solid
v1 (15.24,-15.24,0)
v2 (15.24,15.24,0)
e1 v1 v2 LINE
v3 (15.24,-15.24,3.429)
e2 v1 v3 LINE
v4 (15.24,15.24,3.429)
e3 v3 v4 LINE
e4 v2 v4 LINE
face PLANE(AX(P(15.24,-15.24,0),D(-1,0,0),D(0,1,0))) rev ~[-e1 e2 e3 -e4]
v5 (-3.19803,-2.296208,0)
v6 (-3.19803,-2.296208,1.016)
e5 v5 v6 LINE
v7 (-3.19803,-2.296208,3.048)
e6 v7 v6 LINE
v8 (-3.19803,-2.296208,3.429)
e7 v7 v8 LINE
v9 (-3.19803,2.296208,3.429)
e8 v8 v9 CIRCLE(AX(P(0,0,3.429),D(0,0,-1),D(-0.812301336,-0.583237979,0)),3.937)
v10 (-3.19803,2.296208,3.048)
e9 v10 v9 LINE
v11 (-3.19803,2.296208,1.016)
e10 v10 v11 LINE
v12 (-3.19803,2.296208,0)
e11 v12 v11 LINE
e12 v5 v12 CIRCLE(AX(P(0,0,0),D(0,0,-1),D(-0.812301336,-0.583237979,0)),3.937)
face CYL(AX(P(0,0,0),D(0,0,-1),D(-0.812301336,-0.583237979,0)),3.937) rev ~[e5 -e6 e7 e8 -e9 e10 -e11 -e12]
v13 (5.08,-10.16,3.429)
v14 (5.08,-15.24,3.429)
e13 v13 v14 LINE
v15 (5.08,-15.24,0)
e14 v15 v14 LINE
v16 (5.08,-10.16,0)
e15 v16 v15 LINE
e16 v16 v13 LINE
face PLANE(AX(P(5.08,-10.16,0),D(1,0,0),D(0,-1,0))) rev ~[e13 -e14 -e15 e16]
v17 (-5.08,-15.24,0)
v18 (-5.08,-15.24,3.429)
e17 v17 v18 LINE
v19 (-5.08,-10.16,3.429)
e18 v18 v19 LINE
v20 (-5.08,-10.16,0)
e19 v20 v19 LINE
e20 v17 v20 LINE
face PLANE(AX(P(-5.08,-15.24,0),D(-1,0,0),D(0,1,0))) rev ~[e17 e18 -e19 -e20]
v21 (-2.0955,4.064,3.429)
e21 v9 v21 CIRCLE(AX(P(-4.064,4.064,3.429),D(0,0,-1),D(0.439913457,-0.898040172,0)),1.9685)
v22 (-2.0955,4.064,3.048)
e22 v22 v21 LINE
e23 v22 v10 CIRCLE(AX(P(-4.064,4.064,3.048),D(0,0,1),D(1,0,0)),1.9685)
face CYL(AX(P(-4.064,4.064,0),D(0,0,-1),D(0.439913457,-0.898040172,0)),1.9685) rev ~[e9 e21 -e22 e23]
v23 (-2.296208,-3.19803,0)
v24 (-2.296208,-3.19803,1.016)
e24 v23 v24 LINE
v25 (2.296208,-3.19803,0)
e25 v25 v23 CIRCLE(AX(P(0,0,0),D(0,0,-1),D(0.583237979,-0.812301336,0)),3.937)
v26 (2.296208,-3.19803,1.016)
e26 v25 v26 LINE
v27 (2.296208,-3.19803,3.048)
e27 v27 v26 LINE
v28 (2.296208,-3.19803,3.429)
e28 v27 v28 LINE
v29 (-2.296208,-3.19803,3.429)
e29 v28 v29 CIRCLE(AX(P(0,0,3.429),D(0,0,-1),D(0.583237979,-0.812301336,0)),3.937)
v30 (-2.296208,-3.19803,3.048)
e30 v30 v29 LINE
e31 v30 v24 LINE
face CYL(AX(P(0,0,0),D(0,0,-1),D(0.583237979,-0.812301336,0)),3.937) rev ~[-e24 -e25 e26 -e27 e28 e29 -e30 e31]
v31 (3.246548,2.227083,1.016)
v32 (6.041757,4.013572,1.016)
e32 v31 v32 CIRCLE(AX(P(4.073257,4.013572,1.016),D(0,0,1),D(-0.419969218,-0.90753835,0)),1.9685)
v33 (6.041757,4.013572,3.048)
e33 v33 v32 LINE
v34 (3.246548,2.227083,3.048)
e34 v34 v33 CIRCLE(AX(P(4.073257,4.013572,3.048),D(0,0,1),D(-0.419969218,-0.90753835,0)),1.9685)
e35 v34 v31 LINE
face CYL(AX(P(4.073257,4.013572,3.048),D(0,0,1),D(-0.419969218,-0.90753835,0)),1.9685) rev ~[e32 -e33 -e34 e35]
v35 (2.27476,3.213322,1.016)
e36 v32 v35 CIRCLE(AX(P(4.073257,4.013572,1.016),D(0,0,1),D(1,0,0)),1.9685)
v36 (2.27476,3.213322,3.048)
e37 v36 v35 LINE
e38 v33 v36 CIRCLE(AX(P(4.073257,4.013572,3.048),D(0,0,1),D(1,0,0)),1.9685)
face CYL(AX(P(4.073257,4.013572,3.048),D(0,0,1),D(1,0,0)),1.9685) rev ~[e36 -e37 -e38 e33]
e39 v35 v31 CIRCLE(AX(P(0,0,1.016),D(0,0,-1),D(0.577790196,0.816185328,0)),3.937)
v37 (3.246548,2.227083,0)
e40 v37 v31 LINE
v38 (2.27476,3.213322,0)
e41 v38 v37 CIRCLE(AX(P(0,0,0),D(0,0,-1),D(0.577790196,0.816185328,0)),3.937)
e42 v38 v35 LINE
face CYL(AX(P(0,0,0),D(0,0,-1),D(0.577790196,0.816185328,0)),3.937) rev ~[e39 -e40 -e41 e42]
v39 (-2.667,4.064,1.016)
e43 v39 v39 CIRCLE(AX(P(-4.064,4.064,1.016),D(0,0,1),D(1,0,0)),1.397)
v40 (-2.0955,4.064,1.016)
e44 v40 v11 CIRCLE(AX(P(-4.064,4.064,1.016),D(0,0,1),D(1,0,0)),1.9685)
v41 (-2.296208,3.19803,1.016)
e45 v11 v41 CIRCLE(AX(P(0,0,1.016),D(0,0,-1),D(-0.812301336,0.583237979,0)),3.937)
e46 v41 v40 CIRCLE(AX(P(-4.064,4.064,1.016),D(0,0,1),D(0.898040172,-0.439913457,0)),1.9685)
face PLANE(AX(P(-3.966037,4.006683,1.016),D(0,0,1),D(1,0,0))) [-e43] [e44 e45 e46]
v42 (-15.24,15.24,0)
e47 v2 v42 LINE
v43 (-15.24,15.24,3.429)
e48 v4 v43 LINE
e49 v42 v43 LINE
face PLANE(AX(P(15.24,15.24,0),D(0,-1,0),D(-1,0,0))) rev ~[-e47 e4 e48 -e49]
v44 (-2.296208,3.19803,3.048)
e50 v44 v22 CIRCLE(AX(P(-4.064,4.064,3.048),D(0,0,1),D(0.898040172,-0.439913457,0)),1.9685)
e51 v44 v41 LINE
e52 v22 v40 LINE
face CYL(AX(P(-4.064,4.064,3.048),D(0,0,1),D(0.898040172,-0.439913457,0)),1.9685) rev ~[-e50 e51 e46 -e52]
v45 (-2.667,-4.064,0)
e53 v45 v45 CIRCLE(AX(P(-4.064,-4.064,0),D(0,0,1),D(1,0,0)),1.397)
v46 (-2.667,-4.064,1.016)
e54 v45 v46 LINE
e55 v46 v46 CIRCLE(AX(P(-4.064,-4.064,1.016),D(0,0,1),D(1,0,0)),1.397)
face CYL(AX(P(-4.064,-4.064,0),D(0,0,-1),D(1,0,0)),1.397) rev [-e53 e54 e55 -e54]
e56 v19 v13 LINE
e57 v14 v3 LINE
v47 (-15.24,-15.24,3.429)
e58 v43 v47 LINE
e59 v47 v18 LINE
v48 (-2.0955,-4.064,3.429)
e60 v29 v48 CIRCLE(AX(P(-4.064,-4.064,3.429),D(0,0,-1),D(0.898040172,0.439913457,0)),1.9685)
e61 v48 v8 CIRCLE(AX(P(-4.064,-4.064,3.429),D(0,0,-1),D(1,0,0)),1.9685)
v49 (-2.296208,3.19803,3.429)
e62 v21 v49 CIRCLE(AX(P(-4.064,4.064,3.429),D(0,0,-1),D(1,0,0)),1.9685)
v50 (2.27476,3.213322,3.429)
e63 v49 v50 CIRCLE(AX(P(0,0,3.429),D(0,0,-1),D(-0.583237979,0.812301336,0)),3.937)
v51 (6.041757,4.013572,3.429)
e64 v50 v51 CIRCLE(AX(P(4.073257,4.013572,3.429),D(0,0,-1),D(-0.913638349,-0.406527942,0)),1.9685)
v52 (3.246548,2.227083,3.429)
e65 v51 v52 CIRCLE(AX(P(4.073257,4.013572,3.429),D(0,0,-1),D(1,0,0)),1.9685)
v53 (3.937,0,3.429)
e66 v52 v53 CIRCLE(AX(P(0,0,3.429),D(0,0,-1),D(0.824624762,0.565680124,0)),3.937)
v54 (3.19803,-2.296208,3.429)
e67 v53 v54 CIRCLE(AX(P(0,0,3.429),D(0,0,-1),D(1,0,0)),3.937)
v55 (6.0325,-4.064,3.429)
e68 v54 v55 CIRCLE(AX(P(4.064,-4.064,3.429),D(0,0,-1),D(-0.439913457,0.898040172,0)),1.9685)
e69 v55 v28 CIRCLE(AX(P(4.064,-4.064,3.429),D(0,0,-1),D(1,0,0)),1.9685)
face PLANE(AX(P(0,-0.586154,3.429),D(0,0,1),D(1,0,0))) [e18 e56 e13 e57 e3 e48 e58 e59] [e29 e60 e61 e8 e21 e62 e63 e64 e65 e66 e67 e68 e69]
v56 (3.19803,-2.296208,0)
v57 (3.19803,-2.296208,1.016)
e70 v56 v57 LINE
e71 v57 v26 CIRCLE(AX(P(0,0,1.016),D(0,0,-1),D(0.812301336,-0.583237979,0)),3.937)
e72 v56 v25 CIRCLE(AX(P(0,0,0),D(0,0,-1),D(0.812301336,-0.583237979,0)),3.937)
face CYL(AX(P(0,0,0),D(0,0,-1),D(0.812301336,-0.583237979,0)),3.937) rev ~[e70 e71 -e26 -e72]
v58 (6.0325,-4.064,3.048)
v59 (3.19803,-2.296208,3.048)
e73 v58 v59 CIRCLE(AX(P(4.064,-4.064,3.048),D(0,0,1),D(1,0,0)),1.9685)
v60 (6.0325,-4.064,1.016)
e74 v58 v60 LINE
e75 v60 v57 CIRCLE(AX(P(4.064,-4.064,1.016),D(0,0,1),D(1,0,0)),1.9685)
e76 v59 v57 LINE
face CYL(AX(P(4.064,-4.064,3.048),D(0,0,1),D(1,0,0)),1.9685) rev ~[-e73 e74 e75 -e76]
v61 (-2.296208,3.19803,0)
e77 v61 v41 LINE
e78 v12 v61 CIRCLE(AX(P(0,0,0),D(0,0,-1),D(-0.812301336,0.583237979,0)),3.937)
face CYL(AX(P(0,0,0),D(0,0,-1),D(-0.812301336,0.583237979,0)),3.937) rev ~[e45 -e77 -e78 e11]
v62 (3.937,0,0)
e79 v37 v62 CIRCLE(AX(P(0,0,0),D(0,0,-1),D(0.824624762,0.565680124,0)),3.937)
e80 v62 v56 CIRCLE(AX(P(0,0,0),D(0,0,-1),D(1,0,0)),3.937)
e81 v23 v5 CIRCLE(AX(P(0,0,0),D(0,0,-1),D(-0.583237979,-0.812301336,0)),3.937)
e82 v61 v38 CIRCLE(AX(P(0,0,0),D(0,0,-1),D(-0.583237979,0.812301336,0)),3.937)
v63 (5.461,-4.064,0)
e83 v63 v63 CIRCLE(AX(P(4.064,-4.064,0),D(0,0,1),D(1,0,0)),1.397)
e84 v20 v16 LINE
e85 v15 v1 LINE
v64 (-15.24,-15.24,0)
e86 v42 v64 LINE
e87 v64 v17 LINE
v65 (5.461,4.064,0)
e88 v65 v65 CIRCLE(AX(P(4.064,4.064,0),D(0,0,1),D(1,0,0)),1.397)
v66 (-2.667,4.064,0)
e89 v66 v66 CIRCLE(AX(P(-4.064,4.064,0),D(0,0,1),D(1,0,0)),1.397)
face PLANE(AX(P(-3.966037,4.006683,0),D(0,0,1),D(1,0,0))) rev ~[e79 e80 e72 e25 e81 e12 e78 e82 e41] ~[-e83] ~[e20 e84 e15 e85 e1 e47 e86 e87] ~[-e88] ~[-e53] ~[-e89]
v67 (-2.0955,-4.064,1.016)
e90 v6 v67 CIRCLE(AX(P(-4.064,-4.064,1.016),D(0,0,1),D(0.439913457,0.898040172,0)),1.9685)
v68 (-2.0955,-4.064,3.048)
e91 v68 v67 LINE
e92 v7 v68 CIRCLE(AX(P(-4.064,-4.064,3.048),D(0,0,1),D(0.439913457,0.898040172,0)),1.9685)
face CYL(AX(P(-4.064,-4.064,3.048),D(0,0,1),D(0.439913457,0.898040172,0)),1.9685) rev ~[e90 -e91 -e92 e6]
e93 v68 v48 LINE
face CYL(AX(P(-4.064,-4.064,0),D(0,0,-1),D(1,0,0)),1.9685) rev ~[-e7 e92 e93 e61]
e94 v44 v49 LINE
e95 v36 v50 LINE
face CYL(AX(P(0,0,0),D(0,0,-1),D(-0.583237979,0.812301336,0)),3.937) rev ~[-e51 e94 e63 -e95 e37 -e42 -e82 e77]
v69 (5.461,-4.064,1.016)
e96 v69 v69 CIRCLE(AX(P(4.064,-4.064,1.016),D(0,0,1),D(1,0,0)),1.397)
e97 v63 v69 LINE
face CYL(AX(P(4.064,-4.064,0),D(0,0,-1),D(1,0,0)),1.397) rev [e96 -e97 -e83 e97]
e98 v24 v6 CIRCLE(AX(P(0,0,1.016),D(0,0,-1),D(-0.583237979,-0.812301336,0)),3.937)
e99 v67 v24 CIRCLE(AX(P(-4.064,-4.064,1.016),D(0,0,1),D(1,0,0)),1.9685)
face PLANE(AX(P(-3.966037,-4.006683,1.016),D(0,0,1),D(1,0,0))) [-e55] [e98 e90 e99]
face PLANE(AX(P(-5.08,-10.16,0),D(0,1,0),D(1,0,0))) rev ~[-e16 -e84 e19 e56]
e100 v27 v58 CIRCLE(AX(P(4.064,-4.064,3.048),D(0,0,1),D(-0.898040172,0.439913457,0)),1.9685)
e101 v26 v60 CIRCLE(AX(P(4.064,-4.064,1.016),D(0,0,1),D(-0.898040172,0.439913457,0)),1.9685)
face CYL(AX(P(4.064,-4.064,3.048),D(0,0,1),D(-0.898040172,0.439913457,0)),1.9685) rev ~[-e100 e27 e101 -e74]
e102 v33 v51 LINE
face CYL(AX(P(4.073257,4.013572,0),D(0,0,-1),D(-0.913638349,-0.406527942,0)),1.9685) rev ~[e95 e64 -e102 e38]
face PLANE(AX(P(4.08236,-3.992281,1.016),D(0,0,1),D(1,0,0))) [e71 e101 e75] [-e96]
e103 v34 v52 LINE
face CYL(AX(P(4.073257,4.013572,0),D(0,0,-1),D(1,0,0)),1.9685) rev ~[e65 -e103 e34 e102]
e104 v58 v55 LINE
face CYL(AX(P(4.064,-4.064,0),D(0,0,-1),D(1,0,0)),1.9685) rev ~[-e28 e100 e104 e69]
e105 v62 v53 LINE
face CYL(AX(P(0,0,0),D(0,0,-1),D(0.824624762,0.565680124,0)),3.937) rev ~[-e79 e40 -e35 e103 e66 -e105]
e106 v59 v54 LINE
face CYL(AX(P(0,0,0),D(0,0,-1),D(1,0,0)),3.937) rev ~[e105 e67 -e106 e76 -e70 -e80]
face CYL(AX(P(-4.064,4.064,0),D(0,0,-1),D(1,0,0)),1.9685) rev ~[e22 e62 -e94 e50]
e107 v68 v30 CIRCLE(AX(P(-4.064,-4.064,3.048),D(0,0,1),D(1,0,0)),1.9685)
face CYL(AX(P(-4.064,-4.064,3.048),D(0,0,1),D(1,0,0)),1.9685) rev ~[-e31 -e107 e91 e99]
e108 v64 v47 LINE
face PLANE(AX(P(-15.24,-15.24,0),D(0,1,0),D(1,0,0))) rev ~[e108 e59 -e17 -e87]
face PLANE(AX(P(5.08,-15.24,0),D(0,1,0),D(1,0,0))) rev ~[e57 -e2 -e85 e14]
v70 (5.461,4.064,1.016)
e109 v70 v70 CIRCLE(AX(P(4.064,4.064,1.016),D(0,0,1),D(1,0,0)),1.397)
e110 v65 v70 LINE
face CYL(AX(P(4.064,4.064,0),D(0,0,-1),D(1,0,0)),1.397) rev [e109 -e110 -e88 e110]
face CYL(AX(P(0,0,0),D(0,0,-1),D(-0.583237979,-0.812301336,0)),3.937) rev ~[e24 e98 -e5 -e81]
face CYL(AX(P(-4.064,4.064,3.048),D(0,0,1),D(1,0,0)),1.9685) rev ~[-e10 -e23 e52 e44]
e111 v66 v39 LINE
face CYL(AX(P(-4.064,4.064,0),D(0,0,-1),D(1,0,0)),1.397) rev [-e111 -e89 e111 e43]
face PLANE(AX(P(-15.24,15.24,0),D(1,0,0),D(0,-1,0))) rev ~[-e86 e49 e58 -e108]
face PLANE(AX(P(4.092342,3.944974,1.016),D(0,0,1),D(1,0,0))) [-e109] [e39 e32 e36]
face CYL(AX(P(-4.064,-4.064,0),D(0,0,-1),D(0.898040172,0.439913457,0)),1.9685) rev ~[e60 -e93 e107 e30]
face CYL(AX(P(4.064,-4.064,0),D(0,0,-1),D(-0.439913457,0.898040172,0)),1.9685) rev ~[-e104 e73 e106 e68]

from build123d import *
from build123d import SkipClean  # not in build123d's __all__

# Parameters (mm, degrees)
F1_DEPTH = 3.429
F0_R     = 1.397
F2_DEPTH = 3.048
F3_DEPTH = 2.032


with BuildPart() as f1:
    # F0 (on Top) → F1 (new body)
    with BuildSketch(Plane.XY):
        Polygon((15.24, -15.24), (15.24, 15.24), (-15.24, 15.24), (-15.24, -15.24), (-5.08, -15.24), (-5.08, -10.16), (5.08, -10.16), (5.08, -15.24), align=None)
        with BuildLine():
            ThreePointArc((3.2465476869, 2.227082647), (3.760427319, 1.1658281942), (3.937, 0))
            ThreePointArc((3.937, 0), (3.7477069339, -1.2060935857), (3.1980303594, -2.2962079219))
            ThreePointArc((3.1980303594, -2.2962079219), (5.1057127753, -2.3937225549), (6.0325, -4.064))
            ThreePointArc((6.0325, -4.064), (3.6195376595, -5.9816666754), (2.2962079219, -3.1980303594))
            ThreePointArc((2.2962079219, -3.1980303594), (0, -3.937), (-2.2962079219, -3.1980303594))
            ThreePointArc((-2.2962079219, -3.1980303594), (-2.1463333246, -3.6195376595), (-2.0955, -4.064))
            ThreePointArc((-2.0955, -4.064), (-5.7342774451, -5.1057127753), (-3.1980303594, -2.2962079219))
            ThreePointArc((-3.1980303594, -2.2962079219), (-3.937, 0), (-3.1980303594, 2.2962079219))
            ThreePointArc((-3.1980303594, 2.2962079219), (-5.7342774451, 5.1057127753), (-2.0955, 4.064))
            ThreePointArc((-2.0955, 4.064), (-2.1463333246, 3.6195376595), (-2.2962079219, 3.1980303594))
            ThreePointArc((-2.2962079219, 3.1980303594), (-0.0131703869, 3.9369779706), (2.2747600024, 3.2133216352))
            ThreePointArc((2.2747600024, 3.2133216352), (3.664202861, 5.9391021751), (6.0417570924, 4.0135718882))
            ThreePointArc((6.0417570924, 4.0135718882), (5.1333549146, 2.3549022836), (3.2465476869, 2.227082647))
        make_face(mode=Mode.SUBTRACT)
    extrude(amount=F1_DEPTH)

    # F0 (on Top) → F2 (join)
    with BuildSketch(Plane.XY):
        with BuildLine():
            ThreePointArc((-3.1980303594, 2.2962079219), (-2.7838793975, 2.7838793975), (-2.2962079219, 3.1980303594))
            ThreePointArc((-2.2962079219, 3.1980303594), (-2.1463333246, 3.6195376595), (-2.0955, 4.064))
            ThreePointArc((-2.0955, 4.064), (-5.7342774451, 5.1057127753), (-3.1980303594, 2.2962079219))
        make_face()
        with Locations((-4.064, 4.064)):
            Circle(F0_R, mode=Mode.SUBTRACT)
        with BuildLine():
            ThreePointArc((2.2747600024, 3.2133216352), (2.8043495655, 2.763257591), (3.2465476869, 2.227082647))
            ThreePointArc((3.2465476869, 2.227082647), (5.1333549146, 2.3549022836), (6.0417570924, 4.0135718882))
            ThreePointArc((6.0417570924, 4.0135718882), (3.664202861, 5.9391021751), (2.2747600024, 3.2133216352))
        make_face()
        with Locations((4.064, 4.064)):
            Circle(F0_R, mode=Mode.SUBTRACT)
        with BuildLine():
            ThreePointArc((-2.0955, -4.064), (-2.1463333246, -3.6195376595), (-2.2962079219, -3.1980303594))
            ThreePointArc((-2.2962079219, -3.1980303594), (-2.7838793975, -2.7838793975), (-3.1980303594, -2.2962079219))
            ThreePointArc((-3.1980303594, -2.2962079219), (-5.7342774451, -5.1057127753), (-2.0955, -4.064))
        make_face()
        with Locations((-4.064, -4.064)):
            Circle(F0_R, mode=Mode.SUBTRACT)
        with BuildLine():
            ThreePointArc((6.0325, -4.064), (5.1057127753, -2.3937225549), (3.1980303594, -2.2962079219))
            ThreePointArc((3.1980303594, -2.2962079219), (2.7838793975, -2.7838793975), (2.2962079219, -3.1980303594))
            ThreePointArc((2.2962079219, -3.1980303594), (3.6195376595, -5.9816666754), (6.0325, -4.064))
        make_face()
        with Locations((4.064, -4.064)):
            Circle(F0_R, mode=Mode.SUBTRACT)
    extrude(amount=F2_DEPTH)

    # F3 (cut): faces of the model
    f3_faces = [f1.faces().sort_by_distance(p)[0] for p in [
        (-2.8232493975, 2.8232493975, 3.048),
        (-5.4165696988, -5.4165696988, 3.048),
        (2.8440090574, 2.8023359547, 3.048),
        (5.4165696988, -5.4165696988, 3.048),
    ]]
    with SkipClean():  # cleaning this boolean's faces spoils the solid; the shape is the same uncleaned
        extrude(f3_faces, amount=-F3_DEPTH, mode=Mode.SUBTRACT)


solid = f1.part
